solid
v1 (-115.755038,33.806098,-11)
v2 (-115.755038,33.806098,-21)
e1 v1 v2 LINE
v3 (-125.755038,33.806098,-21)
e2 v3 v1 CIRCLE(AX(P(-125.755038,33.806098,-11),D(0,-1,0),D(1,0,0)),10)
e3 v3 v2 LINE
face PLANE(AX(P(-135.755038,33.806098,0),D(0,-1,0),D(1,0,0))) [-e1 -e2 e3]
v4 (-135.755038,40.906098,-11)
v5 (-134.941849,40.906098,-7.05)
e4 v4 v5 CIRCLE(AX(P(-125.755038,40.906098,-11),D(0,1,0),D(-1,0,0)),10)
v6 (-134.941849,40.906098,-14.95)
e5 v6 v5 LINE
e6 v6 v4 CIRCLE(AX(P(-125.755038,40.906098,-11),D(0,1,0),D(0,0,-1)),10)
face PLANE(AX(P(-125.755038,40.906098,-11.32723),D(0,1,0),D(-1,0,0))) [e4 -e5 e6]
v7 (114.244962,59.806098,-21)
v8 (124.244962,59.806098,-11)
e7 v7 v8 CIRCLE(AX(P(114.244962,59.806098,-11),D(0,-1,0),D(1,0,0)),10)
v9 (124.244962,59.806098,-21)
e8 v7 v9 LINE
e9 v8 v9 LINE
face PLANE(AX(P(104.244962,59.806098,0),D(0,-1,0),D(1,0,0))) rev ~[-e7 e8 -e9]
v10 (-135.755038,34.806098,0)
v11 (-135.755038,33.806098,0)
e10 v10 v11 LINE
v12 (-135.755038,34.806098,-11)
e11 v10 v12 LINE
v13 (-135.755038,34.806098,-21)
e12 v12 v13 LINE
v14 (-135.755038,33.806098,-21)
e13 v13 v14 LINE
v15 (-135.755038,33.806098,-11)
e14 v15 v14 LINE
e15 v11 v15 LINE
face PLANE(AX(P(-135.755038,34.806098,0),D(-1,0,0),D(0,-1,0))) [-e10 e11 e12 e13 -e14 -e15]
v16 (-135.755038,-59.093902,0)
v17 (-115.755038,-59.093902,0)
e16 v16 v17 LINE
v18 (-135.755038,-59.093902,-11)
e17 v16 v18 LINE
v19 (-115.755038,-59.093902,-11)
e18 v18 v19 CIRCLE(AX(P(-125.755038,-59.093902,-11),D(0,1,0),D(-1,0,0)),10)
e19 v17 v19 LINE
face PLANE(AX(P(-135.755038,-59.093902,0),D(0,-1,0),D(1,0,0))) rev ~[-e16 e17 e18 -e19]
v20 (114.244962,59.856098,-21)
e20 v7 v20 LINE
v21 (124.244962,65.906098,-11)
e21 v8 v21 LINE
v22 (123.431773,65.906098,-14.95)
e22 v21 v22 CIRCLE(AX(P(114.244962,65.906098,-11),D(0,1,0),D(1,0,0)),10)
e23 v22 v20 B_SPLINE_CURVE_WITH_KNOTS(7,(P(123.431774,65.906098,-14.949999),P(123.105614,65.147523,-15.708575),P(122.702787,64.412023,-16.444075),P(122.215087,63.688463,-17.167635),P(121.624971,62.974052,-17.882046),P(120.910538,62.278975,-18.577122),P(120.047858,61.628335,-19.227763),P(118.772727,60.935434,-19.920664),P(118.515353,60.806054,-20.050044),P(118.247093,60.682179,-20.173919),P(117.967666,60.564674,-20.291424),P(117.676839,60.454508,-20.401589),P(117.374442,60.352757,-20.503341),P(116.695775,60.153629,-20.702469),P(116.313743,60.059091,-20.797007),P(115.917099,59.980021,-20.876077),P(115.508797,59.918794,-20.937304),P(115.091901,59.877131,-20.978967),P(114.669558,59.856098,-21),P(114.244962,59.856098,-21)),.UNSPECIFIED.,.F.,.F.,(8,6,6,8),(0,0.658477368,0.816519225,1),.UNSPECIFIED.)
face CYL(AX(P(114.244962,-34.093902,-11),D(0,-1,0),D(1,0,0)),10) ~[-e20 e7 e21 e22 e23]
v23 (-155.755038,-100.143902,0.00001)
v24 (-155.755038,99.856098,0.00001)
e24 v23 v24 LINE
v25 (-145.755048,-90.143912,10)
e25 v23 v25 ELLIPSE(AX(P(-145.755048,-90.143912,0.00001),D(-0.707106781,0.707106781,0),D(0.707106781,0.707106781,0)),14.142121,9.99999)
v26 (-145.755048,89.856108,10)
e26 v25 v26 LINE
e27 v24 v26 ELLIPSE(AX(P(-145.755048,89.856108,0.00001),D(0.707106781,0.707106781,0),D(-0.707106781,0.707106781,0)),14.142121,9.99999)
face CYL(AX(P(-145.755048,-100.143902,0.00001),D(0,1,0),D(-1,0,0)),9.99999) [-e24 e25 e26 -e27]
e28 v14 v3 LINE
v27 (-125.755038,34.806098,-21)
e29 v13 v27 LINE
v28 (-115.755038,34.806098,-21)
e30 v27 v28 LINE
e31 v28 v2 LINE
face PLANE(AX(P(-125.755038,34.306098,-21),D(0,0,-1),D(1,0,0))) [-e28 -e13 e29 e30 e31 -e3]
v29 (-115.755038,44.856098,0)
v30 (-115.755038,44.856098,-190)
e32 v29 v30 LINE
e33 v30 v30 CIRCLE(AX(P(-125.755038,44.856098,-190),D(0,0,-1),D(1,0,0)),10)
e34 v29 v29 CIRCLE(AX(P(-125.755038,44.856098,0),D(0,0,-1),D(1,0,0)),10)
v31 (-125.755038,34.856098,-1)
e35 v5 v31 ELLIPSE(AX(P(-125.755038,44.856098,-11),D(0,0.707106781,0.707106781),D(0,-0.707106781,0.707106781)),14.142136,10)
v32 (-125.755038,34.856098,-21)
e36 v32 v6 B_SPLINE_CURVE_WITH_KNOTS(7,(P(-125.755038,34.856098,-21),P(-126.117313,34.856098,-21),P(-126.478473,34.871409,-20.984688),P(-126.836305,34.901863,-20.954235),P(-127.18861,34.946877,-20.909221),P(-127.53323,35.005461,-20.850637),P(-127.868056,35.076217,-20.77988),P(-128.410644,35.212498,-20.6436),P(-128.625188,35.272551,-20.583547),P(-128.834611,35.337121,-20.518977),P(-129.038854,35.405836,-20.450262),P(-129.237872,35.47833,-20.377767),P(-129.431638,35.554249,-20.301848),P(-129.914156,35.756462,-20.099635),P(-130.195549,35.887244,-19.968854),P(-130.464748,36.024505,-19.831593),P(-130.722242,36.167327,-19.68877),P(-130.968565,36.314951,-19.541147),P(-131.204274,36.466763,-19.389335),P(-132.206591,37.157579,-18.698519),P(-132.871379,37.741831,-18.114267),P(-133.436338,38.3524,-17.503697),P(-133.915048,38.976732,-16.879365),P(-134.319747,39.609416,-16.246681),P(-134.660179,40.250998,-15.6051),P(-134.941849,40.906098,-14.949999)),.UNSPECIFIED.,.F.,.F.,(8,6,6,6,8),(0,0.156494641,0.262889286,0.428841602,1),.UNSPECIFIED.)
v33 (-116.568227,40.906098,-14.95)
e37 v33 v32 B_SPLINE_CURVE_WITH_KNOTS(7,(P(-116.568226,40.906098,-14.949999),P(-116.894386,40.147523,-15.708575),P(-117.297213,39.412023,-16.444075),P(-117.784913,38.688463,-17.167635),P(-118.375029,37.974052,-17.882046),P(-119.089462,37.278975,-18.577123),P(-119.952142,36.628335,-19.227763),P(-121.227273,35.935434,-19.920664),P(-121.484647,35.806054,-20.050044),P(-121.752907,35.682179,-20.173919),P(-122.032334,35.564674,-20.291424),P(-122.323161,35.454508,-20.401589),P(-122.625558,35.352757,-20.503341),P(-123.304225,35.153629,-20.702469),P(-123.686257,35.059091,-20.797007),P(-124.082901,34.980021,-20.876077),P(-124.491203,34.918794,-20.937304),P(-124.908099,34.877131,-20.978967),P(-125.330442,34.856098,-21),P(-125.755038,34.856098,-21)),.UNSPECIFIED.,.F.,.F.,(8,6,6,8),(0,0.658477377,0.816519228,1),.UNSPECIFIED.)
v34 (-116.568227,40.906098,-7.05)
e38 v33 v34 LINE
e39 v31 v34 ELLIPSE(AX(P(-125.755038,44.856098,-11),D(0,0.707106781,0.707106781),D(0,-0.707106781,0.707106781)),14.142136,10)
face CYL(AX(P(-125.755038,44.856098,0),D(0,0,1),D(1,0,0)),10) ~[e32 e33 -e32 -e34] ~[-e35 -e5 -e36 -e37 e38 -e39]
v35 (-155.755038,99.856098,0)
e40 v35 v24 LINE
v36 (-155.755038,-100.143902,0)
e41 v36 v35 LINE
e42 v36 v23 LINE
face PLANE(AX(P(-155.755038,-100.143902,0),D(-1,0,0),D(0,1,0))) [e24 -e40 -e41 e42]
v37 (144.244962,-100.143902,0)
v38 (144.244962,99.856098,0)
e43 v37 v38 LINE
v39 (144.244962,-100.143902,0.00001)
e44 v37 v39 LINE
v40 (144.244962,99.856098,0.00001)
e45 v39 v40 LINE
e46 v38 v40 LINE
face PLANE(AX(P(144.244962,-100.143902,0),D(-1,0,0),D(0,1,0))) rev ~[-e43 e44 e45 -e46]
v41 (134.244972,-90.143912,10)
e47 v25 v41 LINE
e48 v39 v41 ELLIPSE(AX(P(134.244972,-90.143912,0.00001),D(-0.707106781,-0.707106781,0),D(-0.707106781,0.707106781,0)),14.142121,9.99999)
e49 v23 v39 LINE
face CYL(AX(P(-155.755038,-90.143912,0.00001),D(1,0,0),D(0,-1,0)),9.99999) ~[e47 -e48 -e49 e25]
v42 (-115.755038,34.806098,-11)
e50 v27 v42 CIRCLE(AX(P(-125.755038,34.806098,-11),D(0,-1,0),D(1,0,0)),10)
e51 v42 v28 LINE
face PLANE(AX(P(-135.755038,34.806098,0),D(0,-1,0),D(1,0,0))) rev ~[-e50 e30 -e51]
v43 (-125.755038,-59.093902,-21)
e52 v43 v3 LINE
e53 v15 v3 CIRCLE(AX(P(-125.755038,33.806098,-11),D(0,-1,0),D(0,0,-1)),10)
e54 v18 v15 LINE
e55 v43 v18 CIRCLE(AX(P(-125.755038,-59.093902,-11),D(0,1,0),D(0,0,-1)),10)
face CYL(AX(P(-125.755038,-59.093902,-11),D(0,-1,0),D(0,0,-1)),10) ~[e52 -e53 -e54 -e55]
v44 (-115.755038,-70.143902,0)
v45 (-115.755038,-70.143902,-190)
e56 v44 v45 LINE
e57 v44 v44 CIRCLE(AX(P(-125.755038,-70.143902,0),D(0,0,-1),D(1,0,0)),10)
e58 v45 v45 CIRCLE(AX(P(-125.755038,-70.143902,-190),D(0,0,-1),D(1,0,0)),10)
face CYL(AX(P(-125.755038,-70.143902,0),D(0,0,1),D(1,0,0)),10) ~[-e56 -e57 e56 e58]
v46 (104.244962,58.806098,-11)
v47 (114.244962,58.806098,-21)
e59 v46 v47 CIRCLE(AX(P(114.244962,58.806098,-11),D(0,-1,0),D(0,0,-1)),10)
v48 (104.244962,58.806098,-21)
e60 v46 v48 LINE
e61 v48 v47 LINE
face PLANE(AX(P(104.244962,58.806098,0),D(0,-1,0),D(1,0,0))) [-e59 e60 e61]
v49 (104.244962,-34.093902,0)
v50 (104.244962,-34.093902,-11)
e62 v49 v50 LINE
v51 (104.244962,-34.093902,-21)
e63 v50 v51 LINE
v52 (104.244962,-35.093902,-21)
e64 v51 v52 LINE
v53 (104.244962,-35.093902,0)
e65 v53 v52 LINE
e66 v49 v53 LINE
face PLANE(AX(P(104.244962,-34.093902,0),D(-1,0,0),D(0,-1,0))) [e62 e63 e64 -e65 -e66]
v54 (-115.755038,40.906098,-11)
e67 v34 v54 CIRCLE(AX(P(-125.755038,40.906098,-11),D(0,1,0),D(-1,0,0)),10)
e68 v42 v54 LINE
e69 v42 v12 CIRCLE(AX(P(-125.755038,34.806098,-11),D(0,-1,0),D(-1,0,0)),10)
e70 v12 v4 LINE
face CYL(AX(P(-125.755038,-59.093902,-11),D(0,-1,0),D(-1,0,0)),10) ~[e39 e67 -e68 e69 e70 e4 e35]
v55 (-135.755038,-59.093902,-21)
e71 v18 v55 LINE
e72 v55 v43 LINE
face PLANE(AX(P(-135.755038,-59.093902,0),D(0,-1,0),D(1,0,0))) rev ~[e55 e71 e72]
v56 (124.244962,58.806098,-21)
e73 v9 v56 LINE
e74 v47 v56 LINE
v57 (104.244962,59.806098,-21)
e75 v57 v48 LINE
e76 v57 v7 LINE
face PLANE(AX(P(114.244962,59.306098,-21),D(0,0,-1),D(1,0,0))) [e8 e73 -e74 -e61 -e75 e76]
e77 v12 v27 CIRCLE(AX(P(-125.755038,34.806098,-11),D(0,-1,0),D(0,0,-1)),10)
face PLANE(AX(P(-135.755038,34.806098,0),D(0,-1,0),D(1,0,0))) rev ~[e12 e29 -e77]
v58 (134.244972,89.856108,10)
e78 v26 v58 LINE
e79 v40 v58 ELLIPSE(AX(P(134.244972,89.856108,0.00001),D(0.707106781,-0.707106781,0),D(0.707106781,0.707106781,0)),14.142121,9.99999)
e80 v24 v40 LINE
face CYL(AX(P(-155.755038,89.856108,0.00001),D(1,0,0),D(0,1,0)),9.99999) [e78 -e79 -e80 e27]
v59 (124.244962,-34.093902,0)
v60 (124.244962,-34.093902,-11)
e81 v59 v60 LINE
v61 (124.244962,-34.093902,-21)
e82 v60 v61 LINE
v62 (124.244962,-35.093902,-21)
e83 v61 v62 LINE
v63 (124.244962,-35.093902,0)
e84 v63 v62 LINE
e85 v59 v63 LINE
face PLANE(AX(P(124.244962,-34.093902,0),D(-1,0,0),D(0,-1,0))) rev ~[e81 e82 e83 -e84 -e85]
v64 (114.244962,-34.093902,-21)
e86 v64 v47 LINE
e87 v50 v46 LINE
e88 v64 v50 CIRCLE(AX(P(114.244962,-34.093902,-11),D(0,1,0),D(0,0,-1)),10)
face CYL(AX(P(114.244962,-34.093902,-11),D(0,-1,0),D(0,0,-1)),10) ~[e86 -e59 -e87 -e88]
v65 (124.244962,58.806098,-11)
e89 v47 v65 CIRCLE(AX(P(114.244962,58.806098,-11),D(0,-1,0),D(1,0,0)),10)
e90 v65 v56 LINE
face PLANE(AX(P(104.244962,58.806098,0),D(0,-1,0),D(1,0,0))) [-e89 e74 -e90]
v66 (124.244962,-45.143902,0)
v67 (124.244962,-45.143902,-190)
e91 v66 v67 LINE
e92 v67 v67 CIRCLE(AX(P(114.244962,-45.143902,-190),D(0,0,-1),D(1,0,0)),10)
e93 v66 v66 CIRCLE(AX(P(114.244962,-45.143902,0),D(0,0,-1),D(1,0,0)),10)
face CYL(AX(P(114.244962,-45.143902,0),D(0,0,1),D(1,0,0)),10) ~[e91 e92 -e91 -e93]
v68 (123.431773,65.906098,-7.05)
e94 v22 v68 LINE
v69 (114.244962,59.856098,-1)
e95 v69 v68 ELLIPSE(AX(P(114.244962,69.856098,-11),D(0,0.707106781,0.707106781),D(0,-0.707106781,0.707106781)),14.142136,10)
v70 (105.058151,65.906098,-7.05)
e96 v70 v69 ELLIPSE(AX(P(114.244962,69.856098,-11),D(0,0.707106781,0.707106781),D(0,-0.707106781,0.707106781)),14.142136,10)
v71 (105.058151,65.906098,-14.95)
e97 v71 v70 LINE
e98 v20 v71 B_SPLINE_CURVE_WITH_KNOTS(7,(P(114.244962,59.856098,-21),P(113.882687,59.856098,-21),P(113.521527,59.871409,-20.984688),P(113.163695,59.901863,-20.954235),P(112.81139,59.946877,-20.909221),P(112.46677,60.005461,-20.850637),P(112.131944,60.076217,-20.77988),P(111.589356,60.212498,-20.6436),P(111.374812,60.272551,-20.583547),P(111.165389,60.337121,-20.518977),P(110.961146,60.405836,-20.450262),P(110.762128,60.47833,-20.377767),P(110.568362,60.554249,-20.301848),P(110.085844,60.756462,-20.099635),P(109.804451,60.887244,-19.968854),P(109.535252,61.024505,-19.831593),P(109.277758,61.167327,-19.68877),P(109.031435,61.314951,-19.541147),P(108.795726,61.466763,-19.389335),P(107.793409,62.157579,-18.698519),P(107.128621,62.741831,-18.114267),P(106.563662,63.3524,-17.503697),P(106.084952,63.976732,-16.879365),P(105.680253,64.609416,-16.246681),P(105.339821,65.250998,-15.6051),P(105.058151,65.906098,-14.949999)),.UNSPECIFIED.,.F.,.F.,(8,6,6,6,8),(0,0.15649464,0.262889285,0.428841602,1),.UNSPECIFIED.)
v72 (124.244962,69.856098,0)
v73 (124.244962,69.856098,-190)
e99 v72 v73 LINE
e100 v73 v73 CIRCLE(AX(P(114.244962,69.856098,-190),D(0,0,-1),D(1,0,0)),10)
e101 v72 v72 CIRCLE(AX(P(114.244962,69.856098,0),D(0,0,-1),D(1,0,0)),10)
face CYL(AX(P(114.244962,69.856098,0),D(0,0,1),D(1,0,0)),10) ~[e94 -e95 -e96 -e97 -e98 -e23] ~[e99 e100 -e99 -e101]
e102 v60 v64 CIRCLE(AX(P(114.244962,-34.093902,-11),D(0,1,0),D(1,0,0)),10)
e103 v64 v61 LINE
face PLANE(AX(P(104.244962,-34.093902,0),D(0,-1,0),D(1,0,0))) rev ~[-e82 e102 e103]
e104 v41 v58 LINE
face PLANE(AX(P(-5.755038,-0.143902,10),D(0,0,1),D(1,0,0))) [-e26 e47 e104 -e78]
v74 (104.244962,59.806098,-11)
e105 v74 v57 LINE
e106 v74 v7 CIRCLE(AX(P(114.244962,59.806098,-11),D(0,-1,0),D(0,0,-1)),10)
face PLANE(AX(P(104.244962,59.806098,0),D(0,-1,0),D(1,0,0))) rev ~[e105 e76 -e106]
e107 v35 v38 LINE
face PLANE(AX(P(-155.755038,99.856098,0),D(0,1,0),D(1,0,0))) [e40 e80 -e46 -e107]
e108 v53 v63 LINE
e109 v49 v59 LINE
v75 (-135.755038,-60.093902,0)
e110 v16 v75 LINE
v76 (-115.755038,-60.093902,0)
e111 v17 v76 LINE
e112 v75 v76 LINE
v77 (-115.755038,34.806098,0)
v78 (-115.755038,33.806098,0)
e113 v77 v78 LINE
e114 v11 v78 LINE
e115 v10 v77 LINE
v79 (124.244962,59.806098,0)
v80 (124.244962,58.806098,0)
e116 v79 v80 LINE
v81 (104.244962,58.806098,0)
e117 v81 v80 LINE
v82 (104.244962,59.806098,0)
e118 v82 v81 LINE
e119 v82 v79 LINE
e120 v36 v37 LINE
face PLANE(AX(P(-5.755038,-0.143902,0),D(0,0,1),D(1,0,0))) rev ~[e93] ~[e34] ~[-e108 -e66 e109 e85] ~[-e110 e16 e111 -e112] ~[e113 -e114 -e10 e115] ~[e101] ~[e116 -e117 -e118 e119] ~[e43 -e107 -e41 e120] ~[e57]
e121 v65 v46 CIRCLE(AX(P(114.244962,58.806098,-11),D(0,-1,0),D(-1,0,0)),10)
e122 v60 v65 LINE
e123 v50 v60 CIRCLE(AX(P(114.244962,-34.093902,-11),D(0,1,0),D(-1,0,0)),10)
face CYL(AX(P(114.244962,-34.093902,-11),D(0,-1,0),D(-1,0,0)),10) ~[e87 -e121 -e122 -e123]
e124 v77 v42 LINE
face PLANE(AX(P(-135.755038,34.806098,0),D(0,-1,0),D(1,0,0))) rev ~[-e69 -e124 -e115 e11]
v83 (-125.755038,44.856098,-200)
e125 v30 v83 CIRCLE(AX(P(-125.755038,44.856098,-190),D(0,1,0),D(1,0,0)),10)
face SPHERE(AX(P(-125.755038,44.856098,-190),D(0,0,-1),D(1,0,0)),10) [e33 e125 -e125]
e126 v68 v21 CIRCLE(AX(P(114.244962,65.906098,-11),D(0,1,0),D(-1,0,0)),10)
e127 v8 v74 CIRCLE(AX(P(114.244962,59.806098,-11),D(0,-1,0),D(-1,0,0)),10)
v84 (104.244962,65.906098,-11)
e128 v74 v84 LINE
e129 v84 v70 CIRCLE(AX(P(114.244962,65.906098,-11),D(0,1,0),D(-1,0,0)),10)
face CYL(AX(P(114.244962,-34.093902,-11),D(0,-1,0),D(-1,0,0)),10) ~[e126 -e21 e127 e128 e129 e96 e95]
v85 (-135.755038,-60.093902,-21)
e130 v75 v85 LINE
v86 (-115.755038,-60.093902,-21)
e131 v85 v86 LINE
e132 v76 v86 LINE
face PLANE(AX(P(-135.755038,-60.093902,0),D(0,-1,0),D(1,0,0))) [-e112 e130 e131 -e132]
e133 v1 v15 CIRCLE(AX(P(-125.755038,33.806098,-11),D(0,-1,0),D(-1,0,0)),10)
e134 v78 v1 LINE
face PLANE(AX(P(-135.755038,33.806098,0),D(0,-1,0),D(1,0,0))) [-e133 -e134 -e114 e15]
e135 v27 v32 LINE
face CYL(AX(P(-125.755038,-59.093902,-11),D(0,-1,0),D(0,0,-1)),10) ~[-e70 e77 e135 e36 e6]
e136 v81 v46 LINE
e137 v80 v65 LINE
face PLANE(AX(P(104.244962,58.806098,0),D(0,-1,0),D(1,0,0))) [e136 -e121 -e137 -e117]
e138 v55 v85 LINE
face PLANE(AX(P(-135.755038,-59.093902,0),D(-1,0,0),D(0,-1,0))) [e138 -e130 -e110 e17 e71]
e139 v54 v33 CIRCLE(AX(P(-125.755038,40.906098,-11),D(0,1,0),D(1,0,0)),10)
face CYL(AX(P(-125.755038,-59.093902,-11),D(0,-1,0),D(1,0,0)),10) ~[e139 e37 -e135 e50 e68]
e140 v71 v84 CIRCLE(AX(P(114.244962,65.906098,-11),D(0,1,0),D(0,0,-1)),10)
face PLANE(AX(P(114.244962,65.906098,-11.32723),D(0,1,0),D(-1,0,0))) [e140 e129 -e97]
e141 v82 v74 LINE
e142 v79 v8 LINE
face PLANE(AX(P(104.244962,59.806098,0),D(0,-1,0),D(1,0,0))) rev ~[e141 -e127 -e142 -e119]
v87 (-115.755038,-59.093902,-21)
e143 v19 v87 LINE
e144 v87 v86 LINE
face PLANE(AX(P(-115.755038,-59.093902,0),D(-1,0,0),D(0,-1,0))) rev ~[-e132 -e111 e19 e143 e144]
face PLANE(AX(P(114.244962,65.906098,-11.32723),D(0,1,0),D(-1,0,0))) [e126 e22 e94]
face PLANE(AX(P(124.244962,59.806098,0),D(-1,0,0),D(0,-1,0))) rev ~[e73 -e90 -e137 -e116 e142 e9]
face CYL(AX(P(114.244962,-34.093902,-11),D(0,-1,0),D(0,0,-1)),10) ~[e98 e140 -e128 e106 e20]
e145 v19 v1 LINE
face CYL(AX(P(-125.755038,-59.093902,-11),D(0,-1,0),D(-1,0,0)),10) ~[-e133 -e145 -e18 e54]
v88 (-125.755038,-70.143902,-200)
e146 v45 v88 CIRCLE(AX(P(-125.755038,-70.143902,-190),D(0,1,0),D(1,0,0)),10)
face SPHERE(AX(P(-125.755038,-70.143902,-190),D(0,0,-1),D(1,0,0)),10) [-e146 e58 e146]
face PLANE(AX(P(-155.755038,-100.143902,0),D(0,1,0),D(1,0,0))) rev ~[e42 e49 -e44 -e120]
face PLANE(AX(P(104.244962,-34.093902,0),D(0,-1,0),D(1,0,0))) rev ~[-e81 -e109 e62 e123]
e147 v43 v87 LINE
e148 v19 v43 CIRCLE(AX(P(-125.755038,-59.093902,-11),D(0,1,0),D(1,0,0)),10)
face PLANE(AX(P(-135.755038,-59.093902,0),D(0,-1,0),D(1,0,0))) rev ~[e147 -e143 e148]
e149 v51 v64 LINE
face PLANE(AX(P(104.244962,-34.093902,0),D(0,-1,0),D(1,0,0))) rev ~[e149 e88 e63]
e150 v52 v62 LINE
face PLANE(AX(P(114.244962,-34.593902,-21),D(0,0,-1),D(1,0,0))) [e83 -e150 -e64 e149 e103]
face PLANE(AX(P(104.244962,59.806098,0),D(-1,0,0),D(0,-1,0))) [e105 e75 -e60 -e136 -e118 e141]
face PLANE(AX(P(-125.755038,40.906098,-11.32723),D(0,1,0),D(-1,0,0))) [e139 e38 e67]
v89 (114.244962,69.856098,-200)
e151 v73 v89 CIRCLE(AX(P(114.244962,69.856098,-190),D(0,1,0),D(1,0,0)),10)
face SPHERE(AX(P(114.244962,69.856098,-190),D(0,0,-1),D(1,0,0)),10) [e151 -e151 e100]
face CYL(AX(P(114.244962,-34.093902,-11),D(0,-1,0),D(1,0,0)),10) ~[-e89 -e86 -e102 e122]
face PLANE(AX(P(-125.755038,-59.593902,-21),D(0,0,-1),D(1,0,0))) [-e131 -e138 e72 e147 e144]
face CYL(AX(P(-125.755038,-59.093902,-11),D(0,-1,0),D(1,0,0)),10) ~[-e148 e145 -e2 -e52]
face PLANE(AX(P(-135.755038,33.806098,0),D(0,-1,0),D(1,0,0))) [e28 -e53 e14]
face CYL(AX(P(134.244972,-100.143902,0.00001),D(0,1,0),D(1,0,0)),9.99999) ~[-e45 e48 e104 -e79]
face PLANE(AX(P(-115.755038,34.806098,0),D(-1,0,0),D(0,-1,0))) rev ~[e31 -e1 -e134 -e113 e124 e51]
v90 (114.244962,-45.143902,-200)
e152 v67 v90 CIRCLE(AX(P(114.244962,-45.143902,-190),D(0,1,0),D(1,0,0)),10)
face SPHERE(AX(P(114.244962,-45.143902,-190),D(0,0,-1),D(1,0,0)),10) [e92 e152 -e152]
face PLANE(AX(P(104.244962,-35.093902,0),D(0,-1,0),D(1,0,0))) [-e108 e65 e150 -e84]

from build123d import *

# Parameters (mm, degrees)
F0_W     = 300
F0_H     = 200
F1_DEPTH = 10
F2_R     = 10
F3_DEPTH = 200
F4_R     = 10
F5_W     = 20
F5_H     = 1
F6_DEPTH = 21
F9_DEPTH = 100
F10_R    = 9.99999


# Not quite as in the source:
# - a fillet or chamfer is up to 0.001 mm smaller than in the source, because OpenCascade refuses the exact size


with BuildPart() as f1:
    # F0 (on Top) → F1 (new body)
    with BuildSketch(Plane.XY):
        with Locations((-5.7550377341, -0.1439023763)):
            Rectangle(F0_W, F0_H)
    extrude(amount=F1_DEPTH)

    # F2 (on face) → F3 (join)
    with BuildSketch(Plane(origin=(0, 0, 0), x_dir=(1, 0, 0), z_dir=(0, 0, -1))):
        with Locations((-125.7550377341, 70.1439023763)):
            Circle(F2_R)
        with Locations((-125.7550377341, -44.8560976237)):
            Circle(F2_R)
        with Locations((114.2449622659, 45.1439023763)):
            Circle(F2_R)
        with Locations((114.2449622659, -69.8560976237)):
            Circle(F2_R)
    extrude(amount=F3_DEPTH)

    # F4
    f4_edges = [f1.edges().sort_by_distance(p)[0] for p in [
        (-135.755038, -70.143902, -200),
        (-135.755038, 44.856098, -200),
        (104.244962, -45.143902, -200),
        (104.244962, 69.856098, -200),
    ]]
    fillet(f4_edges, radius=F4_R)

    # F5 (on face) → F6 (join)
    with BuildSketch(Plane(origin=(0, 0, 0), x_dir=(1, 0, 0), z_dir=(0, 0, -1))):
        with Locations((-125.7550377341, 59.5939023763)):
            Rectangle(F5_W, F5_H)
        with Locations((-125.7550377341, -34.3060976237)):
            Rectangle(F5_W, F5_H)
        with Locations((114.2449622659, -59.3060976237)):
            Rectangle(F5_W, F5_H)
        with Locations((114.2449622659, 34.5939023763)):
            Rectangle(F5_W, F5_H)
    extrude(amount=F6_DEPTH)

    # F7 (on face) + F8 (on face) → F9 (join)
    with BuildSketch(Plane(origin=(0, -59.0939023763, 0), x_dir=(-1, 0, 0), z_dir=(0, 1, 0))):
        with BuildLine():
            ThreePointArc((125.755037734, -21), (132.8261055459, -18.0710678119), (135.7550377341, -11))
            ThreePointArc((135.7550377341, -11), (125.7550377341, -1), (115.7550377341, -11))
            ThreePointArc((115.7550377341, -11), (118.6839699222, -18.0710678119), (125.755037734, -21))
        make_face()
    with BuildSketch(Plane(origin=(0, -34.0939023763, 0), x_dir=(-1, 0, 0), z_dir=(0, 1, 0))):
        with BuildLine():
            ThreePointArc((-114.244962266, -21), (-107.1738944541, -18.0710678119), (-104.2449622659, -11))
            ThreePointArc((-104.2449622659, -11), (-114.2449622659, -1), (-124.2449622659, -11))
            ThreePointArc((-124.2449622659, -11), (-121.3160300778, -18.0710678119), (-114.244962266, -21))
        make_face()
    extrude(amount=F9_DEPTH)

    # F10 (radius 10 in the source; OpenCascade refuses exactly that, so slightly less here)
    f10_edges = [f1.edges().sort_by_distance(p)[0] for p in [
        (-155.755038, -0.143902, 10),
        (-5.755038, 99.856098, 10),
        (144.244962, -0.143902, 10),
        (-5.755038, -100.143902, 10),
    ]]
    fillet(f10_edges, radius=F10_R)


solid = f1.part
